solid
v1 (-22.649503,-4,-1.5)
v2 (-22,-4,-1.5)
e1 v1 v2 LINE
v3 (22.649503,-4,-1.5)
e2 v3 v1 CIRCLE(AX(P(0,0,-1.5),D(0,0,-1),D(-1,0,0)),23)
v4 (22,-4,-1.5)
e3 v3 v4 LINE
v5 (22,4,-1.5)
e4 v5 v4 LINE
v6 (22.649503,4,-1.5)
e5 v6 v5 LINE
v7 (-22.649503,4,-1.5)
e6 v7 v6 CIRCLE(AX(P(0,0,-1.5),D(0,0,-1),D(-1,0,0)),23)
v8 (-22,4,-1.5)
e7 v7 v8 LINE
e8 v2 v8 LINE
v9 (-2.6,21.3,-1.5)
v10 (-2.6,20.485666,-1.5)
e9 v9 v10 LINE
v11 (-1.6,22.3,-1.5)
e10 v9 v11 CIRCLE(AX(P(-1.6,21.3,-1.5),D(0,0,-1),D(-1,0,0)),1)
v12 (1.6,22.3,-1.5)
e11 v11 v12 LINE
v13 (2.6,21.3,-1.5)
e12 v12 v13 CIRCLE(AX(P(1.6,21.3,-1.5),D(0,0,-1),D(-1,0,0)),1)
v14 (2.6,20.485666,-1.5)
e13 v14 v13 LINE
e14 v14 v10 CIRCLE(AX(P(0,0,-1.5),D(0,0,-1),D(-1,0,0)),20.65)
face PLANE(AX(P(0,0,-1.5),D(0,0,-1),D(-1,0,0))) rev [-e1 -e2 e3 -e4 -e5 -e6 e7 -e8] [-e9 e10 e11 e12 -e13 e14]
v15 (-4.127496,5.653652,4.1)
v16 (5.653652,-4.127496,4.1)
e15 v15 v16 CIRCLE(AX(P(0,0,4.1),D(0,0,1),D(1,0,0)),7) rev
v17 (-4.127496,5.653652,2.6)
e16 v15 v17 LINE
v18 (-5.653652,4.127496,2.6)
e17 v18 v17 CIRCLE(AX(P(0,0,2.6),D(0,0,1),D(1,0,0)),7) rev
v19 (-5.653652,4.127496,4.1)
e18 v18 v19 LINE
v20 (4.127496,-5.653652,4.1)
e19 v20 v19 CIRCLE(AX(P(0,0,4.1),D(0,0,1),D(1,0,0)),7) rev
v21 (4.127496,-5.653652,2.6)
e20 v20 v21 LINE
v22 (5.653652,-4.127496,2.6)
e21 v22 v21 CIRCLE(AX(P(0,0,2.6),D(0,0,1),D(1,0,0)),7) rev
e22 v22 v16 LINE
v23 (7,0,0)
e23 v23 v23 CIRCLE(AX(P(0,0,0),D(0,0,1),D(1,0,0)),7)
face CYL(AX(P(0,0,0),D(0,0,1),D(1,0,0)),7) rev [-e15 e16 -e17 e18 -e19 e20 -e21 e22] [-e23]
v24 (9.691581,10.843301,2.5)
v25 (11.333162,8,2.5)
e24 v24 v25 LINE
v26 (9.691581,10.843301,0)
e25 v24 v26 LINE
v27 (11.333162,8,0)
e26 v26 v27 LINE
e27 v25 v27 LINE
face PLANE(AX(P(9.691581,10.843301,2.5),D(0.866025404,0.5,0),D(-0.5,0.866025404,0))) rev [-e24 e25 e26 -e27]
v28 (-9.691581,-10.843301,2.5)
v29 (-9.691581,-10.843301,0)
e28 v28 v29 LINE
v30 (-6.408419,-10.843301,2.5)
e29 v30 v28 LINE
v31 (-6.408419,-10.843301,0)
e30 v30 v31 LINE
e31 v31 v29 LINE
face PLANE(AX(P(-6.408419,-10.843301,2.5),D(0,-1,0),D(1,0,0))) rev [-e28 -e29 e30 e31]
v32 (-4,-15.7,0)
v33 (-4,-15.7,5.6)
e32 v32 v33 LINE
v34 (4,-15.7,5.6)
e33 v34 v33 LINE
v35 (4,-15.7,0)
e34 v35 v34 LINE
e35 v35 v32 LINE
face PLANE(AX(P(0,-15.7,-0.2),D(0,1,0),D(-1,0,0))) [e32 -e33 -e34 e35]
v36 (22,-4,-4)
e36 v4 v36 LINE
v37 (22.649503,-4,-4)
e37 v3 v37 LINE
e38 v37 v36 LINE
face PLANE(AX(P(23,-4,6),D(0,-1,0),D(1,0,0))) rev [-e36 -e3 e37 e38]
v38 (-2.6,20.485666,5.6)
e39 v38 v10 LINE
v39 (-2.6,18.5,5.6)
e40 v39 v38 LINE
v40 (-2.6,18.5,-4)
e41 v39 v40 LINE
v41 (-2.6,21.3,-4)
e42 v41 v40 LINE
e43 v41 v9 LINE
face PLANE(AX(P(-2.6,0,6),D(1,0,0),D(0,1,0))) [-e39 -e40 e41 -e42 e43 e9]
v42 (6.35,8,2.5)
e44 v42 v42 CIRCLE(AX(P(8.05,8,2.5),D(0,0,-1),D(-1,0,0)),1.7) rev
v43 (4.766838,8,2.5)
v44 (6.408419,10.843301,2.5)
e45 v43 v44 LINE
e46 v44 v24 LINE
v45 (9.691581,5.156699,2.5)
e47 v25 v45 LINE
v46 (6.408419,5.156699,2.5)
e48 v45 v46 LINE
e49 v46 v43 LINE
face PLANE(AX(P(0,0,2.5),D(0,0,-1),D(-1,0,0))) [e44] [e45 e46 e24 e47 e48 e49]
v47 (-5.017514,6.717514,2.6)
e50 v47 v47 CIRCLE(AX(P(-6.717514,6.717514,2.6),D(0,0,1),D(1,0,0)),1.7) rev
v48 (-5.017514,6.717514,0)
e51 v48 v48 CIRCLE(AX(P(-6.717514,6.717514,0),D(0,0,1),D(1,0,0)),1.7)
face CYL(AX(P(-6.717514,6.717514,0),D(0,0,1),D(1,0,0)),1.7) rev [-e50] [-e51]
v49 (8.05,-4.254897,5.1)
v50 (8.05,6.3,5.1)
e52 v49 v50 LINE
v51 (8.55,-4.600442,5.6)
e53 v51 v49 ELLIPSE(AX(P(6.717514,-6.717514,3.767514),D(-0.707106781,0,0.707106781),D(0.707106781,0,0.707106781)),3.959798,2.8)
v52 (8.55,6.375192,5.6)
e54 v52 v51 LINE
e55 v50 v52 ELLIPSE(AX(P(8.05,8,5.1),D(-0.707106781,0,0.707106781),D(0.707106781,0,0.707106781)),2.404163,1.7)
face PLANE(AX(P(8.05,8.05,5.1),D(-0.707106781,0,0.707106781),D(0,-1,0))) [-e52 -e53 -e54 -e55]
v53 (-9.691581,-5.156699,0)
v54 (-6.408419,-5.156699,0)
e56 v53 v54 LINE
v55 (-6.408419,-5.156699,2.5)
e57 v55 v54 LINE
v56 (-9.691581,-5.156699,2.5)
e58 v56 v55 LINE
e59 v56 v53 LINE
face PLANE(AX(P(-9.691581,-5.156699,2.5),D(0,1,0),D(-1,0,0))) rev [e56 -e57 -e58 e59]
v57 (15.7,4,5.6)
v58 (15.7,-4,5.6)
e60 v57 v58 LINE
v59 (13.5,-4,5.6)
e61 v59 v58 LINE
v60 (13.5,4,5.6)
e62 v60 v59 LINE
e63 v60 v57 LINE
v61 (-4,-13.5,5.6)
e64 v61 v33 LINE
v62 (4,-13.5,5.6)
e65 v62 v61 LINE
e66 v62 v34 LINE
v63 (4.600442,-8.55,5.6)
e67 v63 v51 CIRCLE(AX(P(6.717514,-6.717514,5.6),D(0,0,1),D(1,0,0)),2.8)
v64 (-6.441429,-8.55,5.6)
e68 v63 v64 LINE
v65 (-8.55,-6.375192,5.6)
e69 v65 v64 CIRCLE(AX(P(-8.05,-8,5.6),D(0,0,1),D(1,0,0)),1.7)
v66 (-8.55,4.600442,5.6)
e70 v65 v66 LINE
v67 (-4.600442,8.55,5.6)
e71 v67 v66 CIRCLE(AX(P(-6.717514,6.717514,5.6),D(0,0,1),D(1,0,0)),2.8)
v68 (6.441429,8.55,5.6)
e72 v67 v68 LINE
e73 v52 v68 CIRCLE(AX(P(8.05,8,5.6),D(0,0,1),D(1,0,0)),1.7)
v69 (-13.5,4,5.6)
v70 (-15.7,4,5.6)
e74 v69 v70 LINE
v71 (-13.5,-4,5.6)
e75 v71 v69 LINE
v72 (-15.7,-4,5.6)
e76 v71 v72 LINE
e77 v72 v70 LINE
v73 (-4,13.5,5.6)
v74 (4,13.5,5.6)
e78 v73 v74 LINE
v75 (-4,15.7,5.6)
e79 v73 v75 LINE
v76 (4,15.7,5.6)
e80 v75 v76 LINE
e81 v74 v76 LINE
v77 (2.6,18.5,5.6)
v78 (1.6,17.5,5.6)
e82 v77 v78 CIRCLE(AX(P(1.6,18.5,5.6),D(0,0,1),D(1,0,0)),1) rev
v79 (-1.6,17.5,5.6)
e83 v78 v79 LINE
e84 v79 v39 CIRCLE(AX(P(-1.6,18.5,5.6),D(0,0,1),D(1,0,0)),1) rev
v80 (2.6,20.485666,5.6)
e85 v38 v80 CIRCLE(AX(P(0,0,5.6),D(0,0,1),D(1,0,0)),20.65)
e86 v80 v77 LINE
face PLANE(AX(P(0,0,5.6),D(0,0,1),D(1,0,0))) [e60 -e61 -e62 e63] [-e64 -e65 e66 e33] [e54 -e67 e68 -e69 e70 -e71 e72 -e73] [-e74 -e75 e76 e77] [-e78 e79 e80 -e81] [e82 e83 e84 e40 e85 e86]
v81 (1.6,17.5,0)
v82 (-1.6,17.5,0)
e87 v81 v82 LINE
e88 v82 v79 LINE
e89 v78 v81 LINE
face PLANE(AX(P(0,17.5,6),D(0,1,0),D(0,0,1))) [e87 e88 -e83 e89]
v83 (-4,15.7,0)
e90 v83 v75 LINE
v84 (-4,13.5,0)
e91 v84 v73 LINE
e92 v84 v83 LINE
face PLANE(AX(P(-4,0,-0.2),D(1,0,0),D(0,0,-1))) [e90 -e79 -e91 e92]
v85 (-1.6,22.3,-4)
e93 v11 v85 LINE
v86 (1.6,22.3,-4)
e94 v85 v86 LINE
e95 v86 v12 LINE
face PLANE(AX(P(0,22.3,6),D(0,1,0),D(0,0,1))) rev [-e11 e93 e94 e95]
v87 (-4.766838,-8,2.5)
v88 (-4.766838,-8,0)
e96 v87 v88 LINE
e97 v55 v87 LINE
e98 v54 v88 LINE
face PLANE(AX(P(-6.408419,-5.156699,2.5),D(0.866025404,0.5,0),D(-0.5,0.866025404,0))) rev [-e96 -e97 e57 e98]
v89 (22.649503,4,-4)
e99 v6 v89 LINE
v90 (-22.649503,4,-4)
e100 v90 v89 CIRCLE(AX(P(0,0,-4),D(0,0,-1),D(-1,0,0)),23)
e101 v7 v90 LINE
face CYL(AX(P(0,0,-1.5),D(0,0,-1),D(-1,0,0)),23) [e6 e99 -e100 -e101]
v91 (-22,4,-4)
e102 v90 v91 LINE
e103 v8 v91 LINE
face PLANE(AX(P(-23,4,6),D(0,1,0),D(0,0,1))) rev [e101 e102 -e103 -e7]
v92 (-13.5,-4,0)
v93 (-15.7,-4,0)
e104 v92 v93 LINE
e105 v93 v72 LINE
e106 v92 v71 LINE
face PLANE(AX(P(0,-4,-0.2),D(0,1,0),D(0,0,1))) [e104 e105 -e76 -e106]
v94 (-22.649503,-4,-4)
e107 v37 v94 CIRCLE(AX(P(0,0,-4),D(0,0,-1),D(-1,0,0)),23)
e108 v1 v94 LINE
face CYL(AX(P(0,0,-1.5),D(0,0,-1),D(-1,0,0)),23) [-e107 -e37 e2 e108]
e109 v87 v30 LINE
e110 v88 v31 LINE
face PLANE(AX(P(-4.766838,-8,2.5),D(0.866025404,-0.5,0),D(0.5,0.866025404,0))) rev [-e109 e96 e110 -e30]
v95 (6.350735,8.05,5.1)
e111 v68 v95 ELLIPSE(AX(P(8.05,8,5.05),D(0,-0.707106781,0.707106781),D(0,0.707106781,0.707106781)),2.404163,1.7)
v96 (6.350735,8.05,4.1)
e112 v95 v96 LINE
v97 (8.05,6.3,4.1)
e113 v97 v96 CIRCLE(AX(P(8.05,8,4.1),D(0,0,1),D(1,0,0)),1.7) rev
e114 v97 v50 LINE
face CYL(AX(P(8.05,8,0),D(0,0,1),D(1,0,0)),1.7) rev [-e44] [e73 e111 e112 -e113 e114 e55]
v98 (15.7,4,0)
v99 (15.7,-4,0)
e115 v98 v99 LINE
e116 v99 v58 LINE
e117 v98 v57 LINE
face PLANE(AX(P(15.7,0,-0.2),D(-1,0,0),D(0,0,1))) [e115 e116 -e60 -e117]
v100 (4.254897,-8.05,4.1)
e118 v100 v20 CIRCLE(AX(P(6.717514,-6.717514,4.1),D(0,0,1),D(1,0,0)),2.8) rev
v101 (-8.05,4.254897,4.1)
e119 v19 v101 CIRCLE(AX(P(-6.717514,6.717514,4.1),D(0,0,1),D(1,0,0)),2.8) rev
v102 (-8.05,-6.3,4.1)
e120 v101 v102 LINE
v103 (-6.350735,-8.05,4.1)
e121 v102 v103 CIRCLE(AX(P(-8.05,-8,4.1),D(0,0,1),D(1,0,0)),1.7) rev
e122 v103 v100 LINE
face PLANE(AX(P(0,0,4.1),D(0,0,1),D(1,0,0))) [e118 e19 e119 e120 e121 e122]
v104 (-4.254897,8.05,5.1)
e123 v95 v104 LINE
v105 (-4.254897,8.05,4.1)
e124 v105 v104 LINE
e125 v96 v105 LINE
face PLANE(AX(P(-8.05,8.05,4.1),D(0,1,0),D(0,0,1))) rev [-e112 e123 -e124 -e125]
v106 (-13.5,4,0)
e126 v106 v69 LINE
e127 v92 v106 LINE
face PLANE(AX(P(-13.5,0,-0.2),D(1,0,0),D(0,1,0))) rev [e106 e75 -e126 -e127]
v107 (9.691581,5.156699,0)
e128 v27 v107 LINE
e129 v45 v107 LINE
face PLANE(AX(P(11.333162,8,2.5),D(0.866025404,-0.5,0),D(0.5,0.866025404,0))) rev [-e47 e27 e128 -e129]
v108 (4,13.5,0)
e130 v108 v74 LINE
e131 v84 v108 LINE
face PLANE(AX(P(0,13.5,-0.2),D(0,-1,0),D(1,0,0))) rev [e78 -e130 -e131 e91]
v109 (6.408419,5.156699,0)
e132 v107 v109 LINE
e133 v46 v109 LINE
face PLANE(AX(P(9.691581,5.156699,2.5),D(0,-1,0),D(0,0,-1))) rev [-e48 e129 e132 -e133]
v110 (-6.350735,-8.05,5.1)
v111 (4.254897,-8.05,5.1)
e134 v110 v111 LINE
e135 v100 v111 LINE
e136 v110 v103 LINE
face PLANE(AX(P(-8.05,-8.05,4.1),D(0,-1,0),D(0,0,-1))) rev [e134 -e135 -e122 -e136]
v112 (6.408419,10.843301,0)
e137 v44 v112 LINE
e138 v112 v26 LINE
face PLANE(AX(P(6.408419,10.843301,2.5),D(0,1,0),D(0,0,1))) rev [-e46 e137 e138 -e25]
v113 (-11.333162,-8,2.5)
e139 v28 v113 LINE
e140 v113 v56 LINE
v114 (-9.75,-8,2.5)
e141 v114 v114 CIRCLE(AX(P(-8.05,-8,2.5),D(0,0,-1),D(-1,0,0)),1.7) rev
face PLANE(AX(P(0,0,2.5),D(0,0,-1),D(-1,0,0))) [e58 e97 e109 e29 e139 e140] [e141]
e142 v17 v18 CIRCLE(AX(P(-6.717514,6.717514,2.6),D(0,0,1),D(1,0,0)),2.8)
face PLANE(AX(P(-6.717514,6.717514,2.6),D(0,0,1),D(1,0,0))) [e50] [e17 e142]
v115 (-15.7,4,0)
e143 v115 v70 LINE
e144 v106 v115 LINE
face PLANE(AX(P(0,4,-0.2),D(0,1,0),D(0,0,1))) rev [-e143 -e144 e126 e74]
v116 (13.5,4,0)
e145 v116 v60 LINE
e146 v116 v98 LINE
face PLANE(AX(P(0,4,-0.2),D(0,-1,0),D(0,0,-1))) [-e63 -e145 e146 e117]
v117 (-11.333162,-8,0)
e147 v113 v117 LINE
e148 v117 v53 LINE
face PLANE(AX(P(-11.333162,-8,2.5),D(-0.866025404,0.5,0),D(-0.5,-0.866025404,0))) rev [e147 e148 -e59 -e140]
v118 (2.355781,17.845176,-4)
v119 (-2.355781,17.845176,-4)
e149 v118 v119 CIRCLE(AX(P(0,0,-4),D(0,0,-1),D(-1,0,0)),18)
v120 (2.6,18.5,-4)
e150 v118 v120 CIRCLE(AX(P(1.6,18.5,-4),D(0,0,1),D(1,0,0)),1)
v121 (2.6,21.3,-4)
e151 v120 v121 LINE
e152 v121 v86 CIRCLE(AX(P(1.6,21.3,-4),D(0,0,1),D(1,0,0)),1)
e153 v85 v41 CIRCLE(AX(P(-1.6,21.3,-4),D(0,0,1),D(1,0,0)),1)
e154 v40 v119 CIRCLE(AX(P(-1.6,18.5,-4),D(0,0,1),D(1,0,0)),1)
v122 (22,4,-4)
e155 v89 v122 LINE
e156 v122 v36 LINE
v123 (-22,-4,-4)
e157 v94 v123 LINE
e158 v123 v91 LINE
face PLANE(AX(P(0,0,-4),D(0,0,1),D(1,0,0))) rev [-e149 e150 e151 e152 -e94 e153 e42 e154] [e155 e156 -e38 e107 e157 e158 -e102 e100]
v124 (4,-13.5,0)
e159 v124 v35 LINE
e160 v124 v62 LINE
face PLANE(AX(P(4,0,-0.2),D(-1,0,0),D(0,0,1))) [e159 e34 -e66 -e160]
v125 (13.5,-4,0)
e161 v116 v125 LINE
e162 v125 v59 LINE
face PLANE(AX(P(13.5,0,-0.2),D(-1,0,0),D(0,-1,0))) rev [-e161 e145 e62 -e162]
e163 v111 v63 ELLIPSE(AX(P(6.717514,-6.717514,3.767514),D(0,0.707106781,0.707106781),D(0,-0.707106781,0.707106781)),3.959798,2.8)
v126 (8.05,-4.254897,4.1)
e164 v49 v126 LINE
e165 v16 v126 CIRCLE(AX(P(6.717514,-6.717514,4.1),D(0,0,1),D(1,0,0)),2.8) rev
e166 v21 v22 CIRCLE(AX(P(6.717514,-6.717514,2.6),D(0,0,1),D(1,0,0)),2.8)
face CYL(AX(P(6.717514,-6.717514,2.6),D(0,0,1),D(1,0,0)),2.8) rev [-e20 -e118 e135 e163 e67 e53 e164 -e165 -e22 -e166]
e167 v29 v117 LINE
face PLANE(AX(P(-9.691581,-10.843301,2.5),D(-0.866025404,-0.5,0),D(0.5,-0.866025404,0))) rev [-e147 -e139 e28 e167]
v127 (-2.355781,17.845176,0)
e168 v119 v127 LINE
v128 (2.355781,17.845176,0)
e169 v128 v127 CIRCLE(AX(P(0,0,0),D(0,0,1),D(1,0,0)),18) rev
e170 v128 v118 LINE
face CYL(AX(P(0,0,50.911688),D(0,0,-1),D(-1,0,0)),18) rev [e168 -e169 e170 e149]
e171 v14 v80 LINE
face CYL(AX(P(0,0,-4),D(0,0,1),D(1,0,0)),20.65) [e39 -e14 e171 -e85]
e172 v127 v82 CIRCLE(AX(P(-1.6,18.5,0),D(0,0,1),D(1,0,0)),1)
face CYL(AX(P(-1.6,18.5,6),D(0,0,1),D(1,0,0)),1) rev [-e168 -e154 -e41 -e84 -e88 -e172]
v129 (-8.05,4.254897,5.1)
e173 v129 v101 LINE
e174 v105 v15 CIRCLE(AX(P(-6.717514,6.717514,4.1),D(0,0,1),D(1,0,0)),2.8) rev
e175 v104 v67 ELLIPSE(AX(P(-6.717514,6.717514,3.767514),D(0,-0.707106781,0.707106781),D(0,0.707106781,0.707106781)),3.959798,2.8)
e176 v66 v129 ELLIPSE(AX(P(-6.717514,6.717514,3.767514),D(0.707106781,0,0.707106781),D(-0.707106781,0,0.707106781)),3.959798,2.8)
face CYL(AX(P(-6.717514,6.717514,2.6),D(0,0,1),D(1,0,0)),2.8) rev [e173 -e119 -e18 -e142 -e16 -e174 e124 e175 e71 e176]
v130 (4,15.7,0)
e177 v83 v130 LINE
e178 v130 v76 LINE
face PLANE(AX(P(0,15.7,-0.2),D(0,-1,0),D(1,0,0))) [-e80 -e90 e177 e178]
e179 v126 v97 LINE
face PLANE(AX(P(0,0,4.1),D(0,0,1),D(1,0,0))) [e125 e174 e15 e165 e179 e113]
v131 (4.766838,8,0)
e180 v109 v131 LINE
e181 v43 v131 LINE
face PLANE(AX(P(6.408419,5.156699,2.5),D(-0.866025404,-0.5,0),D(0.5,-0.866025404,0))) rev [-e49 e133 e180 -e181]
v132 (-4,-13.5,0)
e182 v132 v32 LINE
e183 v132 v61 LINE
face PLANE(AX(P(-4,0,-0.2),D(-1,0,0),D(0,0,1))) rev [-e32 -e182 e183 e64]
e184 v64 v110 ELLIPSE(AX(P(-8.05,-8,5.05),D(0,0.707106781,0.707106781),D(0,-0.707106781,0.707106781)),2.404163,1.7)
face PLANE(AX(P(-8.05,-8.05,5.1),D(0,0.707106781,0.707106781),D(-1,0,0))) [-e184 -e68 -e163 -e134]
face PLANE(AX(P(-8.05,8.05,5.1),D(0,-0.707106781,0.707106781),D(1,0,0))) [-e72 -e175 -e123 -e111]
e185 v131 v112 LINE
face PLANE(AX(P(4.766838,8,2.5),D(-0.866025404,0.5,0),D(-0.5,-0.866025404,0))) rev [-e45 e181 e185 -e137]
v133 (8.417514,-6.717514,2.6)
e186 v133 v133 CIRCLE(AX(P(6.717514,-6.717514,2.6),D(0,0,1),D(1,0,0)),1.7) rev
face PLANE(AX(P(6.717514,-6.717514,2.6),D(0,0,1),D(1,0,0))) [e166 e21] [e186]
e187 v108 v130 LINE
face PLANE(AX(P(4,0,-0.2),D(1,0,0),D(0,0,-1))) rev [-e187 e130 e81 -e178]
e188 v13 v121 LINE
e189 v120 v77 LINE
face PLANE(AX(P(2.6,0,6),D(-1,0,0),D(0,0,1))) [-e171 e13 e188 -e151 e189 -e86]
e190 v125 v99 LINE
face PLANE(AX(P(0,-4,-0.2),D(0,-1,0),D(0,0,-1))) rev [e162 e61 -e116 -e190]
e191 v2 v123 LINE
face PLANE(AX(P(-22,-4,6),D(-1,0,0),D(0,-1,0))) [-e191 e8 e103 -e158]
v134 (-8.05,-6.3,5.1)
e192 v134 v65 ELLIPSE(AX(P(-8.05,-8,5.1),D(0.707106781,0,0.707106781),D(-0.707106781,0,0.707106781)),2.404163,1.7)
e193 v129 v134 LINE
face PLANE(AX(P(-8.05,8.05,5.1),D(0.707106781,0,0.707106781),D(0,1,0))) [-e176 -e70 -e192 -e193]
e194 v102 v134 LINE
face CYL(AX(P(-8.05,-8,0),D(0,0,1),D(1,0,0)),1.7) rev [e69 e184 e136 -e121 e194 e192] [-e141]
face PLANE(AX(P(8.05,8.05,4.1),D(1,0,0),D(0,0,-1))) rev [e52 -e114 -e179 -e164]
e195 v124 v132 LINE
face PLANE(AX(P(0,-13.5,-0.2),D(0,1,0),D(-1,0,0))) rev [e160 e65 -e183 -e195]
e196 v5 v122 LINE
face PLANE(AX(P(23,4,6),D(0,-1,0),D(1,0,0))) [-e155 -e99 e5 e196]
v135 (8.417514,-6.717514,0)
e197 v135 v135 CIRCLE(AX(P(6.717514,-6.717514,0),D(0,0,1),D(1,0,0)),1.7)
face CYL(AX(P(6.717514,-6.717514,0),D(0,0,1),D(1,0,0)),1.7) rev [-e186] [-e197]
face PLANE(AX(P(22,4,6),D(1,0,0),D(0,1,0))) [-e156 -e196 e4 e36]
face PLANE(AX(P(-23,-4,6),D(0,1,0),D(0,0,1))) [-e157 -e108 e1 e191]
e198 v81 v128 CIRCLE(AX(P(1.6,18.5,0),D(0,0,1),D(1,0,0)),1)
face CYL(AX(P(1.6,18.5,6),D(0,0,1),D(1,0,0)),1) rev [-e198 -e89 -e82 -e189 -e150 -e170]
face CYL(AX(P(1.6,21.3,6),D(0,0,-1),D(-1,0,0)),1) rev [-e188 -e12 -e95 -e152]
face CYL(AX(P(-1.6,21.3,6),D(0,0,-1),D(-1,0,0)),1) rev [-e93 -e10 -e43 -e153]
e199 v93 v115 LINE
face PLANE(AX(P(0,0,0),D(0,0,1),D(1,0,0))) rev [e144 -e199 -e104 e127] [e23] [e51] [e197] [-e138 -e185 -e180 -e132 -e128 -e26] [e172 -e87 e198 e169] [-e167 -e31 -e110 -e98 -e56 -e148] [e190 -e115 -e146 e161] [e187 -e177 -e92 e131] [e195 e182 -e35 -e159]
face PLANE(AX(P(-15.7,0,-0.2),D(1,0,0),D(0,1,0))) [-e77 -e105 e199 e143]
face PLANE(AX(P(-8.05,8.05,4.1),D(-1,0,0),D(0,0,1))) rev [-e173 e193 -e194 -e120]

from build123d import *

# Parameters (mm, degrees)
SKETCH_1_R               = 17.4
EXTRUDE_1_DEPTH          = 5.6
SKETCH_2_R               = 1.7
CUT_EXTRUDE_1_DEPTH      = 26.23648153
SKETCH_3_R               = 7
CUT_EXTRUDE_2_DEPTH      = 26.23648153
SKETCH_4_R               = 2.8
CUT_EXTRUDE_3_DEPTH      = 3
SKETCH_5_R               = 1.7
CUT_EXTRUDE_4_DEPTH      = 26.23648153
CUT_EXTRUDE_5_DEPTH      = 2.5
SKETCH_7_W               = 16.1
SKETCH_7_H               = 16.1
CUT_EXTRUDE_6_DEPTH      = 1.5
CHAMFER_1_SIZE           = 0.5
SKETCH_9_W               = 2.2
SKETCH_9_H               = 8
SKETCH_9_W_2             = 8
SKETCH_9_H_2             = 2.2
CUT_EXTRUDE_7_DEPTH      = 26.281613873
BOSS_EXTRUDE1_DEPTH      = 5.6
BOSS_EXTRUDE1_DEPTH_BACK = 4
SKETCH1_R                = 20.65
SKETCH1_R_2              = 17.4
SKETCH3_R                = 23
SKETCH3_R_2              = 20.65
BOSS_EXTRUDE2_DEPTH      = 2.5
SKETCH4_R                = 18
CUT_EXTRUDE3_DEPTH       = 4
SKETCH5_W                = 1
SKETCH5_H                = 8
CUT_EXTRUDE4_DEPTH       = 10
CUT_EXTRUDE6_DEPTH       = 10
FILLET3_R                = 1


with BuildPart() as part:
    # 草图1 → 凸台-拉伸1 (new body)
    with BuildSketch(Plane.XY):
        Circle(SKETCH_1_R)
    extrude(amount=EXTRUDE_1_DEPTH)

    # 草图2 → 切除-拉伸1 (cut, through all)
    with BuildSketch(Plane.XY.offset(5.6)):
        with Locations((-6.717514421, 6.717514421)):
            Circle(SKETCH_2_R)
        with Locations((6.717514421, -6.717514421)):
            Circle(SKETCH_2_R)
    extrude(amount=-CUT_EXTRUDE_1_DEPTH, mode=Mode.SUBTRACT)

    # 草图3 → 切除-拉伸2 (cut, through all)
    with BuildSketch(Plane.XY.offset(5.6)):
        Circle(SKETCH_3_R)
    extrude(amount=-CUT_EXTRUDE_2_DEPTH, mode=Mode.SUBTRACT)

    # 草图4 → 切除-拉伸3 (cut)
    with BuildSketch(Plane.XY.offset(5.6)):
        with Locations((-6.717514421, 6.717514421)):
            Circle(SKETCH_4_R)
        with Locations((6.717514421, -6.717514421)):
            Circle(SKETCH_4_R)
    extrude(amount=-CUT_EXTRUDE_3_DEPTH, mode=Mode.SUBTRACT)

    # 草图5 → 切除-拉伸4 (cut, through all)
    with BuildSketch(Plane.XY.offset(5.6)):
        with Locations((8.05, 8)):
            Circle(SKETCH_5_R)
        with Locations((-8.05, -8)):
            Circle(SKETCH_5_R)
    extrude(amount=-CUT_EXTRUDE_4_DEPTH, mode=Mode.SUBTRACT)

    # 草图6 → 切除-拉伸5 (cut)
    with BuildSketch(Plane(origin=(0, 0, 0), x_dir=(-1, 0, 0), z_dir=(0, 0, -1))):
        Polygon((4.766838493, -8), (6.408419246, -10.84330127), (9.691580754, -10.84330127), (11.333161507, -8), (9.691580754, -5.15669873), (6.408419246, -5.15669873), align=None)
        Polygon((-4.766838493, 8), (-6.408419246, 10.84330127), (-9.691580754, 10.84330127), (-11.333161507, 8), (-9.691580754, 5.15669873), (-6.408419246, 5.15669873), align=None)
    extrude(amount=-CUT_EXTRUDE_5_DEPTH, mode=Mode.SUBTRACT)

    # 草图7 → 切除-拉伸6 (cut)
    with BuildSketch(Plane.XY.offset(5.6)):
        Rectangle(SKETCH_7_W, SKETCH_7_H)
    extrude(amount=-CUT_EXTRUDE_6_DEPTH, mode=Mode.SUBTRACT)

    # 倒角1
    chamfer_1_edges = [part.edges().sort_by_distance(p)[0] for p in [
        (8.05, 1.022551258, 5.6),
        (1.047918985, 8.05, 5.6),
        (-8.05, -1.022551258, 5.6),
        (-1.047918985, -8.05, 5.6),
    ]]
    chamfer(chamfer_1_edges, length=CHAMFER_1_SIZE)

    # 草图8 → 旋转1 (revolve)
    with BuildSketch(Plane(origin=(0, 0, 0), x_dir=(0, 0, -1), z_dir=(1, 0, 0)), mode=Mode.PRIVATE) as revolve_1_sk:
        Polygon((0, 17.4), (0, 17.2), (0.2, 17.4), align=None)
    revolve(revolve_1_sk.sketch.rotate(Axis((0, 0, 0), (0, 0, 1)), 90), axis=Axis((0, 0, 0), (0, 0, 1)))

    # 草图9 → 切除-拉伸7 (cut, through all)
    with BuildSketch(Plane.XY.offset(5.6)):
        with Locations((14.6, 0)):
            Rectangle(SKETCH_9_W, SKETCH_9_H)
        with Locations((0, 14.6)):
            Rectangle(SKETCH_9_W_2, SKETCH_9_H_2)
        with Locations((-14.6, 0)):
            Rectangle(SKETCH_9_W, SKETCH_9_H)
        with Locations((0, -14.6)):
            Rectangle(SKETCH_9_W_2, SKETCH_9_H_2)
    extrude(amount=-CUT_EXTRUDE_7_DEPTH, mode=Mode.SUBTRACT)

    # Sketch1 → Boss-Extrude1 (add, two sides: drawn at the far end of the back side and taken through both)
    with BuildSketch(Plane.XY.offset(-BOSS_EXTRUDE1_DEPTH_BACK)):
        Circle(SKETCH1_R)
        Circle(SKETCH1_R_2, mode=Mode.SUBTRACT)
    extrude(amount=BOSS_EXTRUDE1_DEPTH + BOSS_EXTRUDE1_DEPTH_BACK)

    # Sketch3 → Boss-Extrude2 (add)
    with BuildSketch(Plane(origin=(0, 0, -4), x_dir=(-1, 0, 0), z_dir=(0, 0, -1))):
        Circle(SKETCH3_R)
        with Locations(Location((0, 0, 0), (0, 0, 180))):
            Circle(SKETCH3_R_2, mode=Mode.SUBTRACT)
    extrude(amount=-BOSS_EXTRUDE2_DEPTH)

    # Sketch4 → Cut-Extrude3 (cut)
    with BuildSketch(Plane(origin=(0, 0, -4), x_dir=(-1, 0, 0), z_dir=(0, 0, -1))):
        Circle(SKETCH4_R)
    extrude(amount=-CUT_EXTRUDE3_DEPTH, mode=Mode.SUBTRACT)

    # Sketch5 → Cut-Extrude4 (cut)
    with BuildSketch(Plane(origin=(0, 0, -4), x_dir=(-1, 0, 0), z_dir=(0, 0, -1))):
        with Locations((22.5, 0)):
            Rectangle(SKETCH5_W, SKETCH5_H)
        with Locations((-22.5, 0)):
            Rectangle(SKETCH5_W, SKETCH5_H)
    extrude(amount=-CUT_EXTRUDE4_DEPTH, mode=Mode.SUBTRACT)

    # Sketch7 → Cut-Extrude6 (cut)
    with BuildSketch(Plane(origin=(0, 0, -4), x_dir=(-1, 0, 0), z_dir=(0, 0, -1))):
        with BuildLine():
            Line((0, 18), (0, 22.3))
            Line((0, 22.3), (-2.6, 22.3))
            Line((-2.6, 22.3), (-2.6, 17.811232411))
            ThreePointArc((-2.6, 17.811232411), (-1.303421766, 17.952746077), (0, 18))
        make_face()
        with BuildLine():
            Line((0, 17.5), (0, 18))
            ThreePointArc((0, 18), (-1.303421766, 17.952746077), (-2.6, 17.811232411))
            Line((-2.6, 17.811232411), (-2.6, 17.5))
            Line((-2.6, 17.5), (0, 17.5))
        make_face()
        with BuildLine():
            Line((2.6, 22.3), (0, 22.3))
            Line((0, 22.3), (0, 18))
            ThreePointArc((0, 18), (1.303421766, 17.952746077), (2.6, 17.811232411))
            Line((2.6, 17.811232411), (2.6, 22.3))
        make_face()
        with BuildLine():
            ThreePointArc((2.6, 17.811232411), (1.303421766, 17.952746077), (0, 18))
            Line((0, 18), (0, 17.5))
            Line((0, 17.5), (2.6, 17.5))
            Line((2.6, 17.5), (2.6, 17.811232411))
        make_face()
    extrude(amount=-CUT_EXTRUDE6_DEPTH, mode=Mode.SUBTRACT)

    # Fillet3
    # the kernel refuses this fillet: 1 mm, written as the material it adds along each edge
    with BuildSketch(Plane(origin=(2.6, 22.3, -4), x_dir=(-1, 0, 0), z_dir=(0, 0, 1))) as fillet3_piece_1:
        with BuildLine():
            CenterArc((FILLET3_R, FILLET3_R), FILLET3_R, 180, 90)
            Line((0, FILLET3_R), (-FILLET3_R * 0.02, FILLET3_R))
            Line((-FILLET3_R * 0.02, FILLET3_R), (-FILLET3_R * 0.02, -FILLET3_R * 0.02))
            Line((-FILLET3_R * 0.02, -FILLET3_R * 0.02), (FILLET3_R, -FILLET3_R * 0.02))
            Line((FILLET3_R, -FILLET3_R * 0.02), (FILLET3_R, 0))
        make_face()
    extrude(amount=2.5)
    with BuildSketch(Plane(origin=(-2.6, 22.3, -4), x_dir=(1, 0, 0), z_dir=(0, 0, 1))) as fillet3_piece_2:
        with BuildLine():
            CenterArc((FILLET3_R, -FILLET3_R), FILLET3_R, 90, 90)
            Line((0, -FILLET3_R), (-FILLET3_R * 0.02, -FILLET3_R))
            Line((-FILLET3_R * 0.02, -FILLET3_R), (-FILLET3_R * 0.02, FILLET3_R * 0.02))
            Line((-FILLET3_R * 0.02, FILLET3_R * 0.02), (FILLET3_R, FILLET3_R * 0.02))
            Line((FILLET3_R, FILLET3_R * 0.02), (FILLET3_R, 0))
        make_face()
    extrude(amount=2.5)
    with BuildSketch(Plane(origin=(-2.6, 17.5, -6), x_dir=(0, 1, 0), z_dir=(0, 0, 1))) as fillet3_piece_3_section:
        with BuildLine():
            CenterArc((FILLET3_R, -FILLET3_R), FILLET3_R, 90, 90)
            Line((0, -FILLET3_R), (-FILLET3_R * 0.02, -FILLET3_R))
            Line((-FILLET3_R * 0.02, -FILLET3_R), (-FILLET3_R * 0.02, FILLET3_R * 0.02))
            Line((-FILLET3_R * 0.02, FILLET3_R * 0.02), (FILLET3_R, FILLET3_R * 0.02))
            Line((FILLET3_R, FILLET3_R * 0.02), (FILLET3_R, 0))
        make_face()
    fillet3_piece_3 = extrude(amount=11.6, mode=Mode.PRIVATE)
    fillet3_piece_3 = split(fillet3_piece_3, bisect_by=Plane(origin=(-2.544482942, 18.024809788, 0), z_dir=(0, 0, -1)), keep=Keep.TOP, mode=Mode.PRIVATE)
    fillet3_piece_3 = fillet3_piece_3 - Plane(origin=(0, 0, -2), x_dir=(-1, 0, 0), z_dir=(0, 0, -1)) * Cylinder(18, 28, mode=Mode.PRIVATE)
    fillet3_piece_3 = split(fillet3_piece_3, bisect_by=Plane(origin=(-2.544482942, 18.024809788, -4), z_dir=(0, 0, 1)), keep=Keep.TOP, mode=Mode.PRIVATE)
    add(fillet3_piece_3)
    with BuildSketch(Plane(origin=(-2.6, 17.5, 0), x_dir=(0, 1, 0), z_dir=(0, 0, 1))) as fillet3_piece_4_section:
        with BuildLine():
            CenterArc((FILLET3_R, -FILLET3_R), FILLET3_R, 90, 90)
            Line((0, -FILLET3_R), (-FILLET3_R * 0.02, -FILLET3_R))
            Line((-FILLET3_R * 0.02, -FILLET3_R), (-FILLET3_R * 0.02, FILLET3_R * 0.02))
            Line((-FILLET3_R * 0.02, FILLET3_R * 0.02), (FILLET3_R, FILLET3_R * 0.02))
            Line((FILLET3_R, FILLET3_R * 0.02), (FILLET3_R, 0))
        make_face()
    fillet3_piece_4 = extrude(amount=5.6, mode=Mode.PRIVATE)
    fillet3_piece_4 = fillet3_piece_4 - Plane(origin=(0, 0, 2.8), x_dir=(-1, 0, 0), z_dir=(0, 0, -1)) * Cylinder(18, 16, mode=Mode.PRIVATE)
    add(fillet3_piece_4)
    with BuildSketch(Plane(origin=(-2.6, 17.5, 0), x_dir=(0, 1, 0), z_dir=(0, 0, 1))) as fillet3_piece_5_section:
        with BuildLine():
            CenterArc((FILLET3_R, -FILLET3_R), FILLET3_R, 90, 90)
            Line((0, -FILLET3_R), (-FILLET3_R * 0.02, -FILLET3_R))
            Line((-FILLET3_R * 0.02, -FILLET3_R), (-FILLET3_R * 0.02, FILLET3_R * 0.02))
            Line((-FILLET3_R * 0.02, FILLET3_R * 0.02), (FILLET3_R, FILLET3_R * 0.02))
            Line((FILLET3_R, FILLET3_R * 0.02), (FILLET3_R, 0))
        make_face()
    fillet3_piece_5 = extrude(amount=5.6, mode=Mode.PRIVATE)
    fillet3_piece_5 = fillet3_piece_5 & Plane(origin=(0, 0, 2.8), x_dir=(-1, 0, 0), z_dir=(0, 0, -1)) * Cylinder(18, 16, mode=Mode.PRIVATE)
    add(fillet3_piece_5)
    with BuildSketch(Plane(origin=(2.6, 17.5, -6), x_dir=(-1, 0, 0), z_dir=(0, 0, 1))) as fillet3_piece_6_section:
        with BuildLine():
            CenterArc((FILLET3_R, -FILLET3_R), FILLET3_R, 90, 90)
            Line((0, -FILLET3_R), (-FILLET3_R * 0.02, -FILLET3_R))
            Line((-FILLET3_R * 0.02, -FILLET3_R), (-FILLET3_R * 0.02, FILLET3_R * 0.02))
            Line((-FILLET3_R * 0.02, FILLET3_R * 0.02), (FILLET3_R, FILLET3_R * 0.02))
            Line((FILLET3_R, FILLET3_R * 0.02), (FILLET3_R, 0))
        make_face()
    fillet3_piece_6 = extrude(amount=11.6, mode=Mode.PRIVATE)
    fillet3_piece_6 = split(fillet3_piece_6, bisect_by=Plane(origin=(2.544482942, 18.024809788, 0), z_dir=(0, 0, -1)), keep=Keep.TOP, mode=Mode.PRIVATE)
    fillet3_piece_6 = fillet3_piece_6 - Plane(origin=(0, 0, -2), x_dir=(-1, 0, 0), z_dir=(0, 0, -1)) * Cylinder(18, 28, mode=Mode.PRIVATE)
    fillet3_piece_6 = split(fillet3_piece_6, bisect_by=Plane(origin=(2.544482942, 18.024809788, -4), z_dir=(0, 0, 1)), keep=Keep.TOP, mode=Mode.PRIVATE)
    add(fillet3_piece_6)
    with BuildSketch(Plane(origin=(2.6, 17.5, 0), x_dir=(-1, 0, 0), z_dir=(0, 0, 1))) as fillet3_piece_7_section:
        with BuildLine():
            CenterArc((FILLET3_R, -FILLET3_R), FILLET3_R, 90, 90)
            Line((0, -FILLET3_R), (-FILLET3_R * 0.02, -FILLET3_R))
            Line((-FILLET3_R * 0.02, -FILLET3_R), (-FILLET3_R * 0.02, FILLET3_R * 0.02))
            Line((-FILLET3_R * 0.02, FILLET3_R * 0.02), (FILLET3_R, FILLET3_R * 0.02))
            Line((FILLET3_R, FILLET3_R * 0.02), (FILLET3_R, 0))
        make_face()
    fillet3_piece_7 = extrude(amount=5.6, mode=Mode.PRIVATE)
    fillet3_piece_7 = fillet3_piece_7 & Plane(origin=(0, 0, 2.8), x_dir=(-1, 0, 0), z_dir=(0, 0, -1)) * Cylinder(18, 16, mode=Mode.PRIVATE)
    add(fillet3_piece_7)
    with BuildSketch(Plane(origin=(2.6, 17.5, 0), x_dir=(-1, 0, 0), z_dir=(0, 0, 1))) as fillet3_piece_8_section:
        with BuildLine():
            CenterArc((FILLET3_R, -FILLET3_R), FILLET3_R, 90, 90)
            Line((0, -FILLET3_R), (-FILLET3_R * 0.02, -FILLET3_R))
            Line((-FILLET3_R * 0.02, -FILLET3_R), (-FILLET3_R * 0.02, FILLET3_R * 0.02))
            Line((-FILLET3_R * 0.02, FILLET3_R * 0.02), (FILLET3_R, FILLET3_R * 0.02))
            Line((FILLET3_R, FILLET3_R * 0.02), (FILLET3_R, 0))
        make_face()
    fillet3_piece_8 = extrude(amount=5.6, mode=Mode.PRIVATE)
    fillet3_piece_8 = fillet3_piece_8 - Plane(origin=(0, 0, 2.8), x_dir=(-1, 0, 0), z_dir=(0, 0, -1)) * Cylinder(18, 16, mode=Mode.PRIVATE)
    add(fillet3_piece_8)


solid = part.part
